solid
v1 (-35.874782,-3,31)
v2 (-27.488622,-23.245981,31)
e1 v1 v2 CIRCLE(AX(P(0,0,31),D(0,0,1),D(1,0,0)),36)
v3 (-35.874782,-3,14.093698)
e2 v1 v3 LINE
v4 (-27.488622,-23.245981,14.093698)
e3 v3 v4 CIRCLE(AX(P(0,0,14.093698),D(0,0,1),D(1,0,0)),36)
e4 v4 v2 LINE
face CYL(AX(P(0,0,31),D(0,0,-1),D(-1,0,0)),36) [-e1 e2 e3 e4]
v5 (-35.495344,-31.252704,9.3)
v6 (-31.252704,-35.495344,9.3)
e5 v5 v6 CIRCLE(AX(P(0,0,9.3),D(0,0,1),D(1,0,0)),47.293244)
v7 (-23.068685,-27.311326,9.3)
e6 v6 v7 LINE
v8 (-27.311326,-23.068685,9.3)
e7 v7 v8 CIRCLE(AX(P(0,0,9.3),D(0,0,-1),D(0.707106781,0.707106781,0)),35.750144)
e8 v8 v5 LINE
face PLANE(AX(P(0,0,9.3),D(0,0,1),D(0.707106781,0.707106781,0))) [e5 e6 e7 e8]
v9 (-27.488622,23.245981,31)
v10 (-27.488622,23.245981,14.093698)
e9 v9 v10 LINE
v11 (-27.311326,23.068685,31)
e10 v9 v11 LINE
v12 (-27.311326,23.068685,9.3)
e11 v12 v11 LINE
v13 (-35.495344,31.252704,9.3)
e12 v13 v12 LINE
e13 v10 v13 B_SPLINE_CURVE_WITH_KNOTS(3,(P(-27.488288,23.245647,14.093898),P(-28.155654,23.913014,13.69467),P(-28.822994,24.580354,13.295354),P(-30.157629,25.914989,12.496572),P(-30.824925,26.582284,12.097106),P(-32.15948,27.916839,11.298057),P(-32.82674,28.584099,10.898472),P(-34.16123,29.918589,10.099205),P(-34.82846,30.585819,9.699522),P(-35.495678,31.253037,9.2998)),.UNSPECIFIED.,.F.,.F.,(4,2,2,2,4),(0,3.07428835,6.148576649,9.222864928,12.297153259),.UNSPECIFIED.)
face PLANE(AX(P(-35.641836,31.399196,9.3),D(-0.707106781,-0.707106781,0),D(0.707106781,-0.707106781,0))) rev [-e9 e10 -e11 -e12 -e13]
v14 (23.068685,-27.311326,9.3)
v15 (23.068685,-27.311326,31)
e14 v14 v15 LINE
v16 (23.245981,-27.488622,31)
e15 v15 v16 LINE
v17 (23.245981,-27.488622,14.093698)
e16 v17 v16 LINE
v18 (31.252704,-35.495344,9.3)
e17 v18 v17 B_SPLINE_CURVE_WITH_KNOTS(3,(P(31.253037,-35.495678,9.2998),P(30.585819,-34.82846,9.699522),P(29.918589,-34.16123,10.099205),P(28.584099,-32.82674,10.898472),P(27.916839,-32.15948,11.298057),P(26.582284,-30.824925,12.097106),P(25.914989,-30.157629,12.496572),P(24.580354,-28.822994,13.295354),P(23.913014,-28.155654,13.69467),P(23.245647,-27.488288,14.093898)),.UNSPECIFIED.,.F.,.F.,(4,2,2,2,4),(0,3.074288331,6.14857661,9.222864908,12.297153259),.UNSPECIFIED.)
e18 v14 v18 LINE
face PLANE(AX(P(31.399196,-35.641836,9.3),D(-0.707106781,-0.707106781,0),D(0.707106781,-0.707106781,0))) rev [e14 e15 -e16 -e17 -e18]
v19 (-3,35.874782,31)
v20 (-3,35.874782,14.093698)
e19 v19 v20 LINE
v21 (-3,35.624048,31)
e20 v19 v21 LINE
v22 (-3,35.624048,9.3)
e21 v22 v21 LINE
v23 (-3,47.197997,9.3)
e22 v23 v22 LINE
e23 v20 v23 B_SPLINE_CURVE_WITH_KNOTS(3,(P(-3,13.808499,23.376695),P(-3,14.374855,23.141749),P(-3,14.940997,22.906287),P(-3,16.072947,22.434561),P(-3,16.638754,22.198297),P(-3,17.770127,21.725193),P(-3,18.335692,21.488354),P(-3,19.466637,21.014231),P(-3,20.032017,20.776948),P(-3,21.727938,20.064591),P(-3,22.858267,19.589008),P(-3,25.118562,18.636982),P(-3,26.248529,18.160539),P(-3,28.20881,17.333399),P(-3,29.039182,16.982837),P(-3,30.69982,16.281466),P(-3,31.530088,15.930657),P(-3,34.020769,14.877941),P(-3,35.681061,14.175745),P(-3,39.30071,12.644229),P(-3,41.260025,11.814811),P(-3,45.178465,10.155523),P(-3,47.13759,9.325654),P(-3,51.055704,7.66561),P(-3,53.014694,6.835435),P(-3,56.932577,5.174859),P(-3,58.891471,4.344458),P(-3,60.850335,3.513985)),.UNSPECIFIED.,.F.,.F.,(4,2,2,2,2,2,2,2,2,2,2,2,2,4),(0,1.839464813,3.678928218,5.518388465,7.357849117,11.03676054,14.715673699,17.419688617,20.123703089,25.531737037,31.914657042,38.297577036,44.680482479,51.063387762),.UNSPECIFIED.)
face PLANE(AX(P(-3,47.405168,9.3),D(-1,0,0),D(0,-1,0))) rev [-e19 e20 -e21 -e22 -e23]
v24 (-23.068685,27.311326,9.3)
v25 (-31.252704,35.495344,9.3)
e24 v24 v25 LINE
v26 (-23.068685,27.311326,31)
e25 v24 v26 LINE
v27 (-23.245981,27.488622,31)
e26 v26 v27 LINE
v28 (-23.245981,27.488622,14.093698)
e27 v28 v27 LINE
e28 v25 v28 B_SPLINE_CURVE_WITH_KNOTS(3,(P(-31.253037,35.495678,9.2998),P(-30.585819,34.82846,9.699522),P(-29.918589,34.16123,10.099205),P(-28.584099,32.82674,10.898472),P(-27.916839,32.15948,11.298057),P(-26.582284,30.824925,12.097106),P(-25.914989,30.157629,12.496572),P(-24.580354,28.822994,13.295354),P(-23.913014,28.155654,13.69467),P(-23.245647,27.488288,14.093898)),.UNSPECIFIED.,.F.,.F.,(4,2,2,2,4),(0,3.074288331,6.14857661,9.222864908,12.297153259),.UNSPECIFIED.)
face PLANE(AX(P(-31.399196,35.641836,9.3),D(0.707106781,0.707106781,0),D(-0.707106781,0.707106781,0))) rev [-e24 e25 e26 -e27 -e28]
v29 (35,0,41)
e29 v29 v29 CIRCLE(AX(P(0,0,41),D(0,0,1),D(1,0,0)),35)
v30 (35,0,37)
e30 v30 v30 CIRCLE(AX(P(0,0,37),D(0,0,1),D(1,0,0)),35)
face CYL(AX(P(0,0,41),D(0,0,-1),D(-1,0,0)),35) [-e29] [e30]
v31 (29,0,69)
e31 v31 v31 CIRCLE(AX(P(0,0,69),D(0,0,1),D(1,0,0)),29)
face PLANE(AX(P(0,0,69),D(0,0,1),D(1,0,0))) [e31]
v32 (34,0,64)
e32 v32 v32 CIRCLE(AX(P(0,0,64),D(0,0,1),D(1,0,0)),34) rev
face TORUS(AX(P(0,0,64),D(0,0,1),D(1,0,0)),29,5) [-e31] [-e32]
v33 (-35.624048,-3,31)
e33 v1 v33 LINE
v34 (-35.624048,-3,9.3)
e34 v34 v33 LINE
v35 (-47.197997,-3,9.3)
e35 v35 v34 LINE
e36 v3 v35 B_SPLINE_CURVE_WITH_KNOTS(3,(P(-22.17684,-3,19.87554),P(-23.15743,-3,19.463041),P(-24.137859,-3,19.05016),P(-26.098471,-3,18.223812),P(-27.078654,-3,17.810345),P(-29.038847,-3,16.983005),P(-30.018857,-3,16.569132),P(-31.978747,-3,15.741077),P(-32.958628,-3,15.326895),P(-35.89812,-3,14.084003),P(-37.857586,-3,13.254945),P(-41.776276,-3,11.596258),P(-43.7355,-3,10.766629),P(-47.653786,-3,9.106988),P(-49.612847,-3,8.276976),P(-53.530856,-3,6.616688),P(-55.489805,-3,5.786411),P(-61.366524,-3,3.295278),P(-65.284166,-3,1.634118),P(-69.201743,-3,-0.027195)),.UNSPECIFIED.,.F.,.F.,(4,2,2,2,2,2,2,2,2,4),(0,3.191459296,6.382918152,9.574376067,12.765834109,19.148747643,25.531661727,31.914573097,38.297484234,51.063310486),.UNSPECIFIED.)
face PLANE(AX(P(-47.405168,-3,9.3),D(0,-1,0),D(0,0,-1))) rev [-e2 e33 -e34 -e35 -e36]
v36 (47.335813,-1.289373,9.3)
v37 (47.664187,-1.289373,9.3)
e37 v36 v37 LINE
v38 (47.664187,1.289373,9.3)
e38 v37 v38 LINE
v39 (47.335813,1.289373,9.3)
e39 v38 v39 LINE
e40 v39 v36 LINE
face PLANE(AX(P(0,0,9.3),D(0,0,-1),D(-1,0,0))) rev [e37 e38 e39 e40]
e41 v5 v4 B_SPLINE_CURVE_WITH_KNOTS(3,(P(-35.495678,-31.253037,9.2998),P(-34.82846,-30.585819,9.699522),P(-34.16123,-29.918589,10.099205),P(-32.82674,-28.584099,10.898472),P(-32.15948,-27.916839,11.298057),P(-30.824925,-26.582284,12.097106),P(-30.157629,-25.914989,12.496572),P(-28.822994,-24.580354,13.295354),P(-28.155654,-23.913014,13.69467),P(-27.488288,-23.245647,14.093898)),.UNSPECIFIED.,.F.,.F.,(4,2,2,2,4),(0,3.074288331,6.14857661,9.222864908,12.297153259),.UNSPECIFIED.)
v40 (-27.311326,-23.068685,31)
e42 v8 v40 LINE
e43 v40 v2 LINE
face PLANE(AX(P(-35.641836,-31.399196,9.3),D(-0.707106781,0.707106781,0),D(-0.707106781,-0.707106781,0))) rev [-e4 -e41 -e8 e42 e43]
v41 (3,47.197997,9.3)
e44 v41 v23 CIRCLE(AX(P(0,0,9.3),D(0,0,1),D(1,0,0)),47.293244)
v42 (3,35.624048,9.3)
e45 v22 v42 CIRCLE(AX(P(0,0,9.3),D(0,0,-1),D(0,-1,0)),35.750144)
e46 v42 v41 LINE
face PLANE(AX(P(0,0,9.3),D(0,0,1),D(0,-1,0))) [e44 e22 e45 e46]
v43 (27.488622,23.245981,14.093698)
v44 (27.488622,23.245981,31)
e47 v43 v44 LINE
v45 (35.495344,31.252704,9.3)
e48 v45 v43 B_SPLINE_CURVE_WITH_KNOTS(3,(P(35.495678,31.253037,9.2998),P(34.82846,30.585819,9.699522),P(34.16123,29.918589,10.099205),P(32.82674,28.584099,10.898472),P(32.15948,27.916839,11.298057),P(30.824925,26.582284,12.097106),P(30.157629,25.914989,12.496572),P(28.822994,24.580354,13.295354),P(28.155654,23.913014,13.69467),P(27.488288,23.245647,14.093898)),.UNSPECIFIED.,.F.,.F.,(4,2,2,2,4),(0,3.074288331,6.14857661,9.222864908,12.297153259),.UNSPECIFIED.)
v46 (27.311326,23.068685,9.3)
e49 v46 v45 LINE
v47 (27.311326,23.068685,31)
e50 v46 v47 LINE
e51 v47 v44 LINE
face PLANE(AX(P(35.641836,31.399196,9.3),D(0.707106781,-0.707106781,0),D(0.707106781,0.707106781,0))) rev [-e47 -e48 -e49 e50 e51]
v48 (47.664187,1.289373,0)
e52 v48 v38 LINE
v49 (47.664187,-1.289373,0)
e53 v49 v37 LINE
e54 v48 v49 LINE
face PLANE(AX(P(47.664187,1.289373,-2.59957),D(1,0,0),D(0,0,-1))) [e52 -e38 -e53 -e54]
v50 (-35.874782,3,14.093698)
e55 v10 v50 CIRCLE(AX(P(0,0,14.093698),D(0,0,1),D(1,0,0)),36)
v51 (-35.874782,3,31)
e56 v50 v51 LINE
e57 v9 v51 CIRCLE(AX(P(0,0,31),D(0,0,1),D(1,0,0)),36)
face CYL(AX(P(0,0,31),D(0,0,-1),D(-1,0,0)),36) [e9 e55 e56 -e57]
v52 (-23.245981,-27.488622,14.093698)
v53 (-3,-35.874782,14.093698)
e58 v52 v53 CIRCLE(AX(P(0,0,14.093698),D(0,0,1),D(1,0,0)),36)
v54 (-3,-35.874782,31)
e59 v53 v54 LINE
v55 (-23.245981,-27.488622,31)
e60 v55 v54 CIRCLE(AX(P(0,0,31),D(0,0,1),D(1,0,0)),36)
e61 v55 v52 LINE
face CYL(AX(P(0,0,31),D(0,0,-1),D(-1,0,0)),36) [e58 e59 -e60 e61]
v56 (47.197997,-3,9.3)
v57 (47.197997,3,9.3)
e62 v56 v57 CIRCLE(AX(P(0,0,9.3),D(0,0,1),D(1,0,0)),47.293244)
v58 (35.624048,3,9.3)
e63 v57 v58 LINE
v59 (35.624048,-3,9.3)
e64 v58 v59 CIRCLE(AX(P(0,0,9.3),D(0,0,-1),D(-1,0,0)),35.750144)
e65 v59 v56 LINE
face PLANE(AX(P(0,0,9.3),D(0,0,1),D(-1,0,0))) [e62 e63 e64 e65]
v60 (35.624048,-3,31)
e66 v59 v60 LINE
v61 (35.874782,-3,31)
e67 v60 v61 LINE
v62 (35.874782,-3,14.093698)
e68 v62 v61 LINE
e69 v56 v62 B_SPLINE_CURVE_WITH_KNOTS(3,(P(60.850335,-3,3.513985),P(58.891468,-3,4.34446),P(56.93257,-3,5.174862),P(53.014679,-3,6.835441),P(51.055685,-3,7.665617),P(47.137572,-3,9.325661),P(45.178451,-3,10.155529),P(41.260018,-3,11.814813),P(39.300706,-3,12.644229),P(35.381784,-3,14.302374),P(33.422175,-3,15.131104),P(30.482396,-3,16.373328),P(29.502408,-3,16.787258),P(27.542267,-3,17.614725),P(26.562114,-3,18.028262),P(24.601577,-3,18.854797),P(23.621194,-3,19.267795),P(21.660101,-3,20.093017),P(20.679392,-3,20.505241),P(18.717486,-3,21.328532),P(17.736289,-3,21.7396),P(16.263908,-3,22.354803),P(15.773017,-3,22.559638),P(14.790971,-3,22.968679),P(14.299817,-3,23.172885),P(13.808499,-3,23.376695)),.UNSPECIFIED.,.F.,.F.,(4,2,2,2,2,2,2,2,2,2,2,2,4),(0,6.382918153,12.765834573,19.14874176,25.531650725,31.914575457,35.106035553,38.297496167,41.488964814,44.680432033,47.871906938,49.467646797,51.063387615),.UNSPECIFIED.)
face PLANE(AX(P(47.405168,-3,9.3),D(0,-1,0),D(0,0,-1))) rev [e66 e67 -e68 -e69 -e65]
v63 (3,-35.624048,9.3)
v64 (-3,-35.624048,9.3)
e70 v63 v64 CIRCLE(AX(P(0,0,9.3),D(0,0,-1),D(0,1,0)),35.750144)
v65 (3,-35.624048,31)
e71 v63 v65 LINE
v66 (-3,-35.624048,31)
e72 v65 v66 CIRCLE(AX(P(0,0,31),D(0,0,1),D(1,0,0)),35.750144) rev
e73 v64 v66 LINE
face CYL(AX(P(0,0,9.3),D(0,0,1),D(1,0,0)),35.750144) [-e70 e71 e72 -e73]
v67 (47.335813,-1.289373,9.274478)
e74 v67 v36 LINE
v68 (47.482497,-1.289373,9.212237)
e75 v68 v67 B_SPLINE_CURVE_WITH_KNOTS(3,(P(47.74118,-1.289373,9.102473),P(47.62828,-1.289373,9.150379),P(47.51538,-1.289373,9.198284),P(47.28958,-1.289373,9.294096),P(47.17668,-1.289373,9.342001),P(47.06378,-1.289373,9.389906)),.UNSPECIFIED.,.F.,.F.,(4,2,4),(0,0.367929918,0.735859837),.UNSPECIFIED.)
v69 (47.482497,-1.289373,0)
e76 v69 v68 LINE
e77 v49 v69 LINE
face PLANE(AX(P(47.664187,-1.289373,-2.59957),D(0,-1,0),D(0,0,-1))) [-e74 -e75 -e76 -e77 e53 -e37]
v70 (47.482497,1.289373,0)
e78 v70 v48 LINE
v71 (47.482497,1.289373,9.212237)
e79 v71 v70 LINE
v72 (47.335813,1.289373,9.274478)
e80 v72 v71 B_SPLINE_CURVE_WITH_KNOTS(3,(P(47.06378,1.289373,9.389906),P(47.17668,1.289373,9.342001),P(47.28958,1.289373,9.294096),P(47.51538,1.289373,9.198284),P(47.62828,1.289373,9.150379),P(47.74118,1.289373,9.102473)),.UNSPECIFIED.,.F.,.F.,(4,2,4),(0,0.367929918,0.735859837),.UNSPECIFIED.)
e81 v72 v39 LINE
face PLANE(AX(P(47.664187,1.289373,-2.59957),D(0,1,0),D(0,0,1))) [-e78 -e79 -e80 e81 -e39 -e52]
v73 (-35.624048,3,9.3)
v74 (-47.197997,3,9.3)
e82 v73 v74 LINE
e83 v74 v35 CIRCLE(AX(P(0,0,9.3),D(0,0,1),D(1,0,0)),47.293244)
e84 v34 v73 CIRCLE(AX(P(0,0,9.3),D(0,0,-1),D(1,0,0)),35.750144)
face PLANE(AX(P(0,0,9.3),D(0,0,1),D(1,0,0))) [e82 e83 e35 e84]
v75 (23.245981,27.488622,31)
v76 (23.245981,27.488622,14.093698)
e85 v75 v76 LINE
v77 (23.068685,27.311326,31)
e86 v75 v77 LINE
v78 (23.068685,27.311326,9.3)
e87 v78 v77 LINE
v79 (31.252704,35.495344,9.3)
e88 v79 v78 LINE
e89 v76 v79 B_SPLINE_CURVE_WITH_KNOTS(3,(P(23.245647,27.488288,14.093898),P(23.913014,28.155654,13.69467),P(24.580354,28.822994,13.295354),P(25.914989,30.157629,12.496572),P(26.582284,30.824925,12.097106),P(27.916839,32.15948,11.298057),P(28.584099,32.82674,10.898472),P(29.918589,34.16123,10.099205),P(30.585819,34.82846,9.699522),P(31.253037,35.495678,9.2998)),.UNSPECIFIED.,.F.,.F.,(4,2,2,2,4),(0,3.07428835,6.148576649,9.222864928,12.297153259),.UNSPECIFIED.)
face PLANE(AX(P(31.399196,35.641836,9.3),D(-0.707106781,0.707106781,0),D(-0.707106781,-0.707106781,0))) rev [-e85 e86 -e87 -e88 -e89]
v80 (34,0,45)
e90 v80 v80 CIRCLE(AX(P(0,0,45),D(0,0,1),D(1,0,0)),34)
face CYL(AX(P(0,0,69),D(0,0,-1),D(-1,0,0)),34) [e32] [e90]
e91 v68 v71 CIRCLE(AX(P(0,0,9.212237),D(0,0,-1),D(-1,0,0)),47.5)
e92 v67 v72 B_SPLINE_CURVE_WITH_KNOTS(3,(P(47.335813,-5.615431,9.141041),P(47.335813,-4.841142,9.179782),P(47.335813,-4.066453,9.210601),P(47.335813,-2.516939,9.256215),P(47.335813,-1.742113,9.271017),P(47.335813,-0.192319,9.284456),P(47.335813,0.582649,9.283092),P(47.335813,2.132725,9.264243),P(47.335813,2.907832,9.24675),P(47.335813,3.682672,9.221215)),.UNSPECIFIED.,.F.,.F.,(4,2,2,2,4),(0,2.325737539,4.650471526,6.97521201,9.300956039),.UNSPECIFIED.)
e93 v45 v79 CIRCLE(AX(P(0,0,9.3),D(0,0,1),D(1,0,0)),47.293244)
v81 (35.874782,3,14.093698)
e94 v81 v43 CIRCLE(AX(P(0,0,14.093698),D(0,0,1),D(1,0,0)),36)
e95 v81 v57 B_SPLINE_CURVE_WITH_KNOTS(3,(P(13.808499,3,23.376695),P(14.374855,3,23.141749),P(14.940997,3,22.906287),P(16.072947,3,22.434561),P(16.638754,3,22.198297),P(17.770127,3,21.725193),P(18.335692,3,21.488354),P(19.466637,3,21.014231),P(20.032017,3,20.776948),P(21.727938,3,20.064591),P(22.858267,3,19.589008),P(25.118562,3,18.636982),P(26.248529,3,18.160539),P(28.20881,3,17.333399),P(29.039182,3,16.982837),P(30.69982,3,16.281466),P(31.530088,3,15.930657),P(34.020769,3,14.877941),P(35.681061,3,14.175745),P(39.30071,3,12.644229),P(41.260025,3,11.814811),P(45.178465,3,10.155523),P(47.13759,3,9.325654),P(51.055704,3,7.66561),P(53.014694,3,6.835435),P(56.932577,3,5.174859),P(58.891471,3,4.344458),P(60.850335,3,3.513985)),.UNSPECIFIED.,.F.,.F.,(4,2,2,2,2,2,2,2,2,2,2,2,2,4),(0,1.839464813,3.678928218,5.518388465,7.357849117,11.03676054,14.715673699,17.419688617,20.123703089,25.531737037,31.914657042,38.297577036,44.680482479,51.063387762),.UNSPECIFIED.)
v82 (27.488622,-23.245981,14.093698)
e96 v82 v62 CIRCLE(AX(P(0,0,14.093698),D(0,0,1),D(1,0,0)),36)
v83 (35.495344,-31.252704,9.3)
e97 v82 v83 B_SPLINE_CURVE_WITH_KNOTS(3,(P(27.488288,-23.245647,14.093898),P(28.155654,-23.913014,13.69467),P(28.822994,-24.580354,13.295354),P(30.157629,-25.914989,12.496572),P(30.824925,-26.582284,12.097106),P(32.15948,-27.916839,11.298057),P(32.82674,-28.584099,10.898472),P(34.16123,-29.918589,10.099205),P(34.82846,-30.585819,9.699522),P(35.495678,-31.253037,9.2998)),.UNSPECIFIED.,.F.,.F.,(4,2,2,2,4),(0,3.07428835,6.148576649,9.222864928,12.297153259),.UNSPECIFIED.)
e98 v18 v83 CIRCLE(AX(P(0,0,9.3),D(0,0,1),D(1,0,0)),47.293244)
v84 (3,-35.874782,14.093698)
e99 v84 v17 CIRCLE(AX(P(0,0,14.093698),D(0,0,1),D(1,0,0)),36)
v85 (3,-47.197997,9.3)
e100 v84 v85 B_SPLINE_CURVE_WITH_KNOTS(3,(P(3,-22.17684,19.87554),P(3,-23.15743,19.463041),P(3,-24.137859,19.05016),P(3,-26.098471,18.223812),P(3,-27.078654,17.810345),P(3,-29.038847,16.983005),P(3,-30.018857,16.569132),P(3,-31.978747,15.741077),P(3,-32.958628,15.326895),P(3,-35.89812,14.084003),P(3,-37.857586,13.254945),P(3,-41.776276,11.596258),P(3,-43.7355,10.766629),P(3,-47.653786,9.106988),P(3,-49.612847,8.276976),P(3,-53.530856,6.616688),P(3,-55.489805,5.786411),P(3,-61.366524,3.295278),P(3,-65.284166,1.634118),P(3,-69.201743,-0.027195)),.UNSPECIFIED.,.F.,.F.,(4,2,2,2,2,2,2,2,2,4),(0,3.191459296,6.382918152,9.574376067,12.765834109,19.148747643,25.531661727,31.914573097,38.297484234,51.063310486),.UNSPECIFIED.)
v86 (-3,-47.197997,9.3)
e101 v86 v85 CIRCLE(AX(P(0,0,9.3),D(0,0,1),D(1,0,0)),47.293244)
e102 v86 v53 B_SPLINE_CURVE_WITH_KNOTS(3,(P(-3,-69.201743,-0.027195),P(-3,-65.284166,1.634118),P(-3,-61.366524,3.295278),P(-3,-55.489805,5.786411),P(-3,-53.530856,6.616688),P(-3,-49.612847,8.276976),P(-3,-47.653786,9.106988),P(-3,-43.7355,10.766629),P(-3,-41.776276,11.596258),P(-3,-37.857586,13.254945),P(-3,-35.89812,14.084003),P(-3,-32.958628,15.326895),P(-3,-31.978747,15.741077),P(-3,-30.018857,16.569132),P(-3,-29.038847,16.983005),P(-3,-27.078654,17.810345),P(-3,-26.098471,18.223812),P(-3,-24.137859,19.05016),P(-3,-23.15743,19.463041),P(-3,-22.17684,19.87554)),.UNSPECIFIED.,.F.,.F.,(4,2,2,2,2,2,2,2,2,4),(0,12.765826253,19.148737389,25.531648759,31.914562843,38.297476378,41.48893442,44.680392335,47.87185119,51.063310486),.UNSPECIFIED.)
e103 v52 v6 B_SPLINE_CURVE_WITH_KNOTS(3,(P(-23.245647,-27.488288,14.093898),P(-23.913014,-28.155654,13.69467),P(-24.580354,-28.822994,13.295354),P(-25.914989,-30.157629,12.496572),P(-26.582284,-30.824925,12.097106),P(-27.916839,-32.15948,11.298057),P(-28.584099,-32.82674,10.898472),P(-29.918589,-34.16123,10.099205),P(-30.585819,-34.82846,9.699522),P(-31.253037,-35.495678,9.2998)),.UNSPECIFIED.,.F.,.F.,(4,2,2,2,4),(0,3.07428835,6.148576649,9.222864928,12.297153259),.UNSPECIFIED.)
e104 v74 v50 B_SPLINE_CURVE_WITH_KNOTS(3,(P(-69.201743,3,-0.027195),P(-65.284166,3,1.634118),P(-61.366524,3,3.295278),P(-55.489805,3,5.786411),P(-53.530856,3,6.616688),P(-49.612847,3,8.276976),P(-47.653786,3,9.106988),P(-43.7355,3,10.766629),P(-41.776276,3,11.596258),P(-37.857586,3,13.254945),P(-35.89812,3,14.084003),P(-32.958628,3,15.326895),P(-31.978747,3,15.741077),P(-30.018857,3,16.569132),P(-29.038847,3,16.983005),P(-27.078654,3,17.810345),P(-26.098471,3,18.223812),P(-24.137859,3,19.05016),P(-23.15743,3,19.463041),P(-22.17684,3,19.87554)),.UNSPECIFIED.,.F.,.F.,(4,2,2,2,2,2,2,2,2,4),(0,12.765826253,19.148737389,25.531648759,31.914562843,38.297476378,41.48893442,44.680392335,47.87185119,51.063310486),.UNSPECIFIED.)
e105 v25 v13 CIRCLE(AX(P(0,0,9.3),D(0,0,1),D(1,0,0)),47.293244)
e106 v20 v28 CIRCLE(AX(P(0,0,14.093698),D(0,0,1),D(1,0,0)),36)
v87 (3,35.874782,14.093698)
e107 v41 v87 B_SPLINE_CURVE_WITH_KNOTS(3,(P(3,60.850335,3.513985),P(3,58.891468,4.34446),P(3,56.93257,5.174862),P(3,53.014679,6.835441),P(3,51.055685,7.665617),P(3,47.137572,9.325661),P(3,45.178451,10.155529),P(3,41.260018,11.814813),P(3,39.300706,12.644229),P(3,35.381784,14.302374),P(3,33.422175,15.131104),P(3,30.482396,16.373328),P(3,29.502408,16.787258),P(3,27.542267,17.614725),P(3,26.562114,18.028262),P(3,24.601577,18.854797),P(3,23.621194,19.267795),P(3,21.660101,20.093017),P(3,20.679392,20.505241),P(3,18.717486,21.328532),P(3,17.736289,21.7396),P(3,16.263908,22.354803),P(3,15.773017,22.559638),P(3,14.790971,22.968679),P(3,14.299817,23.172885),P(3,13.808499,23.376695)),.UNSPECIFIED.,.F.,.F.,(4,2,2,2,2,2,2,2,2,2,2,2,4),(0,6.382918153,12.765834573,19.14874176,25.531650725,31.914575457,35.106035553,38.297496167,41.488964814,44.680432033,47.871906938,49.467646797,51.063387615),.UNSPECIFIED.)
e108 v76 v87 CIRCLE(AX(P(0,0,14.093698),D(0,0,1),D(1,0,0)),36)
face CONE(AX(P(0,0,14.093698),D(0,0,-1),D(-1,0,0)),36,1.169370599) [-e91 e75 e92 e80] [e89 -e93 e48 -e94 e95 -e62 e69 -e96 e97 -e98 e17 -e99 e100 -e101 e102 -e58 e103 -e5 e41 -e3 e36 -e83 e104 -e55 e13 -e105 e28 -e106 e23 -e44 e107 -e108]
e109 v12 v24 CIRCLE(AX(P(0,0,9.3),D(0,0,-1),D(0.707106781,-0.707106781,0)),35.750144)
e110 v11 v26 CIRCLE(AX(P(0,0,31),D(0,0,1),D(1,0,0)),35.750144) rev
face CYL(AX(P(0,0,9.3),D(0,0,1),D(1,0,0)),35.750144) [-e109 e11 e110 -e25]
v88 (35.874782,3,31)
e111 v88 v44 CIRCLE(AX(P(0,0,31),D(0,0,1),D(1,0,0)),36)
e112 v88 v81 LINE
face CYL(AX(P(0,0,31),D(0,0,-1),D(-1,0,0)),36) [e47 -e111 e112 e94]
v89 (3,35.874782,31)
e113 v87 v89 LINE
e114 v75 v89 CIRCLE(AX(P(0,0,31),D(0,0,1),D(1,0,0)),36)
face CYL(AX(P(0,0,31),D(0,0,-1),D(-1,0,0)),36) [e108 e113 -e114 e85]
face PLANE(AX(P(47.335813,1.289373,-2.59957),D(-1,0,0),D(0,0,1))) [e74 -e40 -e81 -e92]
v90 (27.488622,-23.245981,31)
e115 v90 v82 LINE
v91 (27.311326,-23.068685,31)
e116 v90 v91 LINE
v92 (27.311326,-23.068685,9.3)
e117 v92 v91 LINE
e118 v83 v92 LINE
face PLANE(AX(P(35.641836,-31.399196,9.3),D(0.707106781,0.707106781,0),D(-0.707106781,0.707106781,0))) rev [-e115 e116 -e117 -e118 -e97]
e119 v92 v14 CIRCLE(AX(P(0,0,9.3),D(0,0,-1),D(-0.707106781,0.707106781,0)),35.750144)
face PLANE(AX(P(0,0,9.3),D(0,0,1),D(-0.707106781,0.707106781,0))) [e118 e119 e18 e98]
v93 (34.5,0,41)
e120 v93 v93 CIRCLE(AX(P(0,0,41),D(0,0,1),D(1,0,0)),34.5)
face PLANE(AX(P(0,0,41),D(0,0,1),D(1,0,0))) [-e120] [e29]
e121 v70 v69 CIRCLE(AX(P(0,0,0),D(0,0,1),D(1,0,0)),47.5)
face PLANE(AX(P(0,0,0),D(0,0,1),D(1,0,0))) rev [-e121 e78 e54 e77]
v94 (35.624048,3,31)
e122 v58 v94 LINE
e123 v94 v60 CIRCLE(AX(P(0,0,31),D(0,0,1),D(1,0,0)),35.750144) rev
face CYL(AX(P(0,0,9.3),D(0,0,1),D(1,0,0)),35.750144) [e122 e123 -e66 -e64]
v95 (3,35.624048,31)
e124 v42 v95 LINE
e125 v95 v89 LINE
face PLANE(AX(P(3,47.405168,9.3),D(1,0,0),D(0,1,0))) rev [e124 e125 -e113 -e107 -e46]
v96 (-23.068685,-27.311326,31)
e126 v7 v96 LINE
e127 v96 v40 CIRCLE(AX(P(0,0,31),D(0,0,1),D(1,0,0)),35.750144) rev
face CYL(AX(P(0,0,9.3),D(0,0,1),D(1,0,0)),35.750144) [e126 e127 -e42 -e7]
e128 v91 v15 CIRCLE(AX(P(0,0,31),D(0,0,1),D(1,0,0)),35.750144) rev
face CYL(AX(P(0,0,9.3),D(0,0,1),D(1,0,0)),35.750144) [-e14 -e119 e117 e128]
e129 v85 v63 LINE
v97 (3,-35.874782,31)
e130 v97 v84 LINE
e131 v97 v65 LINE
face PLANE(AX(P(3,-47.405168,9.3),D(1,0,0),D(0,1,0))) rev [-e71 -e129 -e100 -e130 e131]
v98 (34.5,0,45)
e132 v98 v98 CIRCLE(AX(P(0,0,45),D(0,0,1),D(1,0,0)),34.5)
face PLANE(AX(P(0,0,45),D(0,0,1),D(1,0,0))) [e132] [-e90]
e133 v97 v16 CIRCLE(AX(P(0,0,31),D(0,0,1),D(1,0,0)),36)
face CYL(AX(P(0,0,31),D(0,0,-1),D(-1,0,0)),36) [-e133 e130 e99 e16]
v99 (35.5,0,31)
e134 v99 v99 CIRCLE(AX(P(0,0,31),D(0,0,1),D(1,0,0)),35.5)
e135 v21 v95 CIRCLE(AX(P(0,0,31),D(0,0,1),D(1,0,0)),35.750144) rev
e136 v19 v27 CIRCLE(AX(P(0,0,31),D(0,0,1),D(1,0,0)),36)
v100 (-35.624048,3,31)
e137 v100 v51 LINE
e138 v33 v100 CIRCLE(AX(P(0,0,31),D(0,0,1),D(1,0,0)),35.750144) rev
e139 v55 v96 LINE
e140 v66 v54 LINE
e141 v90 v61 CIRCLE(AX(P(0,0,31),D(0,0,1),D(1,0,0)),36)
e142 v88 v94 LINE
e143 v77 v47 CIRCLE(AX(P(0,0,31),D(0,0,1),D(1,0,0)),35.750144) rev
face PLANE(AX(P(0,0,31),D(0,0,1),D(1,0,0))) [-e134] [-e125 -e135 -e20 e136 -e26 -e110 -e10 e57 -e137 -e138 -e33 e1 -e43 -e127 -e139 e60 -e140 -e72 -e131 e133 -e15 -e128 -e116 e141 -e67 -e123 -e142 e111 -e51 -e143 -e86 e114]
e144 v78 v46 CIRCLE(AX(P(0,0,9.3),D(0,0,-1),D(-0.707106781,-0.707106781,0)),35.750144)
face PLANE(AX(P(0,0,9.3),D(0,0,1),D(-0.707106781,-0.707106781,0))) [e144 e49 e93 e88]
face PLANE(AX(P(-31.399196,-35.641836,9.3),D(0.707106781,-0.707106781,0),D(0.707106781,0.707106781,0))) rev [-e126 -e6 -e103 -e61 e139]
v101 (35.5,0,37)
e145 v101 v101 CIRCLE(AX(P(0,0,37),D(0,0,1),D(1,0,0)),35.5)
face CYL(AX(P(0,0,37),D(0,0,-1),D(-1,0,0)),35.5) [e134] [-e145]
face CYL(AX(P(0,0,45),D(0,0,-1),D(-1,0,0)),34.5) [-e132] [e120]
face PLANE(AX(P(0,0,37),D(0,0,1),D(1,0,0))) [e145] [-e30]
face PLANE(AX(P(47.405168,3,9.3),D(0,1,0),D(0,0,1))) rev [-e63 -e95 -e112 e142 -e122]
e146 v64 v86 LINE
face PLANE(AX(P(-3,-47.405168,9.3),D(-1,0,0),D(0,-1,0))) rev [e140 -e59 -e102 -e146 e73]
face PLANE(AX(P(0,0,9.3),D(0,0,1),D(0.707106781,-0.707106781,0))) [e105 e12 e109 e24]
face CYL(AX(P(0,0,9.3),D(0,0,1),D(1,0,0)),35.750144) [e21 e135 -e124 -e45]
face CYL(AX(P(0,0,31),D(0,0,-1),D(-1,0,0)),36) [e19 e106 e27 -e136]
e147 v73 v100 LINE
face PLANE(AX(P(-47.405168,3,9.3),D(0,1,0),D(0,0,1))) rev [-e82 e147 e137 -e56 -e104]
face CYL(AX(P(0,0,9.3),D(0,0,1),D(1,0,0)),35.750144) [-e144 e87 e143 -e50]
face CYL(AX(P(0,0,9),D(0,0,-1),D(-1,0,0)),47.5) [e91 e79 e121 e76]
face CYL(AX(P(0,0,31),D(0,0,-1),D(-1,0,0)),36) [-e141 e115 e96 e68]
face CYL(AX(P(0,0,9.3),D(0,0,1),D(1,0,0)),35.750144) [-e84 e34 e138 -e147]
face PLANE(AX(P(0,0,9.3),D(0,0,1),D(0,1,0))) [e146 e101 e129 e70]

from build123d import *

# Parameters (mm, degrees)
CROQUIS1_R              = 47.5
SALIENTE_EXTRUIR1_DEPTH = 9
CROQUIS2_R              = 36
SALIENTE_EXTRUIR2_DEPTH = 22
CROQUIS3_R              = 35.5
SALIENTE_EXTRUIR3_DEPTH = 6
CROQUIS4_R              = 35
SALIENTE_EXTRUIR4_DEPTH = 4
CROQUIS5_R              = 34.5
SALIENTE_EXTRUIR5_DEPTH = 4
CROQUIS6_R              = 34
SALIENTE_EXTRUIR6_DEPTH = 24
REDONDEO1_R             = 5
CHAFL_N1_SIZE           = 5.093697795
CHAFL_N1_SIZE_2         = 12
CORTAR_EXTRUIR1_START   = -59.7
CORTAR_EXTRUIR1_DEPTH   = 59.7
MATRIZC1_COUNT          = 8
SALIENTE_EXTRUIR7_REACH = 91.87
CROQUIS8_W              = 0.328373722
CROQUIS8_H              = 2.57874632


with BuildPart() as part:
    # Croquis1 → Saliente-Extruir1 (new body)
    with BuildSketch(Plane.XY):
        Circle(CROQUIS1_R)
    extrude(amount=SALIENTE_EXTRUIR1_DEPTH)

    # Croquis2 → Saliente-Extruir2 (add)
    with BuildSketch(Plane.XY.offset(9)):
        Circle(CROQUIS2_R)
    extrude(amount=SALIENTE_EXTRUIR2_DEPTH)

    # Croquis3 → Saliente-Extruir3 (add)
    with BuildSketch(Plane.XY.offset(31)):
        Circle(CROQUIS3_R)
    extrude(amount=SALIENTE_EXTRUIR3_DEPTH)

    # Croquis4 → Saliente-Extruir4 (add)
    with BuildSketch(Plane.XY.offset(37)):
        Circle(CROQUIS4_R)
    extrude(amount=SALIENTE_EXTRUIR4_DEPTH)

    # Croquis5 → Saliente-Extruir5 (add)
    with BuildSketch(Plane.XY.offset(41)):
        Circle(CROQUIS5_R)
    extrude(amount=SALIENTE_EXTRUIR5_DEPTH)

    # Croquis6 → Saliente-Extruir6 (add)
    with BuildSketch(Plane.XY.offset(45)):
        Circle(CROQUIS6_R)
    extrude(amount=SALIENTE_EXTRUIR6_DEPTH)

    # Redondeo1
    redondeo1_edges = [part.edges().sort_by_distance(p)[0] for p in [
        (-34, 0, 69),
    ]]
    fillet(redondeo1_edges, radius=REDONDEO1_R)

    # Chaflán1
    # the kernel refuses this chamfer: 12, 5.093697795 mm, written as the material it adds along each edge
    with BuildSketch(Plane(origin=(0, 0, 9), x_dir=(1, 0, 0), z_dir=(0, -1, 0))) as chafl_n1_piece_1_section:
        Polygon((36, CHAFL_N1_SIZE), (36 + CHAFL_N1_SIZE_2, 0), (36, 0), align=None)
    chafl_n1_piece_1 = revolve(axis=Axis((0, 0, 9), (0, 0, 1)), mode=Mode.PRIVATE)
    chafl_n1_piece_1 = chafl_n1_piece_1 & Plane(origin=(0, 0, 11.556485036), x_dir=(1, 0, 0), z_dir=(0, 0, -1)) * Cylinder(47.5, 192, mode=Mode.PRIVATE)
    add(chafl_n1_piece_1)

    # Croquis7 → Cortar-Extruir1 (cut)
    with BuildSketch(Plane.XY.offset(69).offset(CORTAR_EXTRUIR1_START)):
        with BuildLine():
            Line((-47.405168495, 3), (-35.624047548, 3))
            ThreePointArc((-35.624047548, 3), (-35.750143548, 0), (-35.624047548, -3))
            Line((-35.624047548, -3), (-47.405168495, -3))
            ThreePointArc((-47.405168495, -3), (-47.5, 0), (-47.405168495, 3))
        make_face()
    cortar_extruir1 = extrude(amount=CORTAR_EXTRUIR1_DEPTH, mode=Mode.SUBTRACT)

    # MatrizC1: Cortar-Extruir1 ×8 about axis
    matrizc1_axis = Axis((0, 0, 0), (0, 0, 1))
    for i in range(1, MATRIZC1_COUNT):
        add(cortar_extruir1.rotate(matrizc1_axis, i * 360 / MATRIZC1_COUNT), mode=Mode.SUBTRACT)

    # Saliente-Extruir7: up to this face of the body (flat: up to its plane)
    saliente_extruir7_end = Plane(part.part.faces().sort_by_distance((0, 0, 0))[0])
    # Croquis8 → Saliente-Extruir7 (add, up to the picked face)
    with BuildSketch(Plane.XY.offset(9.3), mode=Mode.PRIVATE) as saliente_extruir7_sk1:
        with Locations((47.5, 0)):
            Rectangle(CROQUIS8_W, CROQUIS8_H)
    saliente_extruir7_tool1 = split(extrude(saliente_extruir7_sk1.sketch, amount=-SALIENTE_EXTRUIR7_REACH, mode=Mode.PRIVATE), bisect_by=saliente_extruir7_end, keep=Keep.BOTH, mode=Mode.PRIVATE)
    add(saliente_extruir7_tool1.solids().sort_by(Axis((47.5, 0, 9.3), (0, 0, -1)))[0])


solid = part.part
